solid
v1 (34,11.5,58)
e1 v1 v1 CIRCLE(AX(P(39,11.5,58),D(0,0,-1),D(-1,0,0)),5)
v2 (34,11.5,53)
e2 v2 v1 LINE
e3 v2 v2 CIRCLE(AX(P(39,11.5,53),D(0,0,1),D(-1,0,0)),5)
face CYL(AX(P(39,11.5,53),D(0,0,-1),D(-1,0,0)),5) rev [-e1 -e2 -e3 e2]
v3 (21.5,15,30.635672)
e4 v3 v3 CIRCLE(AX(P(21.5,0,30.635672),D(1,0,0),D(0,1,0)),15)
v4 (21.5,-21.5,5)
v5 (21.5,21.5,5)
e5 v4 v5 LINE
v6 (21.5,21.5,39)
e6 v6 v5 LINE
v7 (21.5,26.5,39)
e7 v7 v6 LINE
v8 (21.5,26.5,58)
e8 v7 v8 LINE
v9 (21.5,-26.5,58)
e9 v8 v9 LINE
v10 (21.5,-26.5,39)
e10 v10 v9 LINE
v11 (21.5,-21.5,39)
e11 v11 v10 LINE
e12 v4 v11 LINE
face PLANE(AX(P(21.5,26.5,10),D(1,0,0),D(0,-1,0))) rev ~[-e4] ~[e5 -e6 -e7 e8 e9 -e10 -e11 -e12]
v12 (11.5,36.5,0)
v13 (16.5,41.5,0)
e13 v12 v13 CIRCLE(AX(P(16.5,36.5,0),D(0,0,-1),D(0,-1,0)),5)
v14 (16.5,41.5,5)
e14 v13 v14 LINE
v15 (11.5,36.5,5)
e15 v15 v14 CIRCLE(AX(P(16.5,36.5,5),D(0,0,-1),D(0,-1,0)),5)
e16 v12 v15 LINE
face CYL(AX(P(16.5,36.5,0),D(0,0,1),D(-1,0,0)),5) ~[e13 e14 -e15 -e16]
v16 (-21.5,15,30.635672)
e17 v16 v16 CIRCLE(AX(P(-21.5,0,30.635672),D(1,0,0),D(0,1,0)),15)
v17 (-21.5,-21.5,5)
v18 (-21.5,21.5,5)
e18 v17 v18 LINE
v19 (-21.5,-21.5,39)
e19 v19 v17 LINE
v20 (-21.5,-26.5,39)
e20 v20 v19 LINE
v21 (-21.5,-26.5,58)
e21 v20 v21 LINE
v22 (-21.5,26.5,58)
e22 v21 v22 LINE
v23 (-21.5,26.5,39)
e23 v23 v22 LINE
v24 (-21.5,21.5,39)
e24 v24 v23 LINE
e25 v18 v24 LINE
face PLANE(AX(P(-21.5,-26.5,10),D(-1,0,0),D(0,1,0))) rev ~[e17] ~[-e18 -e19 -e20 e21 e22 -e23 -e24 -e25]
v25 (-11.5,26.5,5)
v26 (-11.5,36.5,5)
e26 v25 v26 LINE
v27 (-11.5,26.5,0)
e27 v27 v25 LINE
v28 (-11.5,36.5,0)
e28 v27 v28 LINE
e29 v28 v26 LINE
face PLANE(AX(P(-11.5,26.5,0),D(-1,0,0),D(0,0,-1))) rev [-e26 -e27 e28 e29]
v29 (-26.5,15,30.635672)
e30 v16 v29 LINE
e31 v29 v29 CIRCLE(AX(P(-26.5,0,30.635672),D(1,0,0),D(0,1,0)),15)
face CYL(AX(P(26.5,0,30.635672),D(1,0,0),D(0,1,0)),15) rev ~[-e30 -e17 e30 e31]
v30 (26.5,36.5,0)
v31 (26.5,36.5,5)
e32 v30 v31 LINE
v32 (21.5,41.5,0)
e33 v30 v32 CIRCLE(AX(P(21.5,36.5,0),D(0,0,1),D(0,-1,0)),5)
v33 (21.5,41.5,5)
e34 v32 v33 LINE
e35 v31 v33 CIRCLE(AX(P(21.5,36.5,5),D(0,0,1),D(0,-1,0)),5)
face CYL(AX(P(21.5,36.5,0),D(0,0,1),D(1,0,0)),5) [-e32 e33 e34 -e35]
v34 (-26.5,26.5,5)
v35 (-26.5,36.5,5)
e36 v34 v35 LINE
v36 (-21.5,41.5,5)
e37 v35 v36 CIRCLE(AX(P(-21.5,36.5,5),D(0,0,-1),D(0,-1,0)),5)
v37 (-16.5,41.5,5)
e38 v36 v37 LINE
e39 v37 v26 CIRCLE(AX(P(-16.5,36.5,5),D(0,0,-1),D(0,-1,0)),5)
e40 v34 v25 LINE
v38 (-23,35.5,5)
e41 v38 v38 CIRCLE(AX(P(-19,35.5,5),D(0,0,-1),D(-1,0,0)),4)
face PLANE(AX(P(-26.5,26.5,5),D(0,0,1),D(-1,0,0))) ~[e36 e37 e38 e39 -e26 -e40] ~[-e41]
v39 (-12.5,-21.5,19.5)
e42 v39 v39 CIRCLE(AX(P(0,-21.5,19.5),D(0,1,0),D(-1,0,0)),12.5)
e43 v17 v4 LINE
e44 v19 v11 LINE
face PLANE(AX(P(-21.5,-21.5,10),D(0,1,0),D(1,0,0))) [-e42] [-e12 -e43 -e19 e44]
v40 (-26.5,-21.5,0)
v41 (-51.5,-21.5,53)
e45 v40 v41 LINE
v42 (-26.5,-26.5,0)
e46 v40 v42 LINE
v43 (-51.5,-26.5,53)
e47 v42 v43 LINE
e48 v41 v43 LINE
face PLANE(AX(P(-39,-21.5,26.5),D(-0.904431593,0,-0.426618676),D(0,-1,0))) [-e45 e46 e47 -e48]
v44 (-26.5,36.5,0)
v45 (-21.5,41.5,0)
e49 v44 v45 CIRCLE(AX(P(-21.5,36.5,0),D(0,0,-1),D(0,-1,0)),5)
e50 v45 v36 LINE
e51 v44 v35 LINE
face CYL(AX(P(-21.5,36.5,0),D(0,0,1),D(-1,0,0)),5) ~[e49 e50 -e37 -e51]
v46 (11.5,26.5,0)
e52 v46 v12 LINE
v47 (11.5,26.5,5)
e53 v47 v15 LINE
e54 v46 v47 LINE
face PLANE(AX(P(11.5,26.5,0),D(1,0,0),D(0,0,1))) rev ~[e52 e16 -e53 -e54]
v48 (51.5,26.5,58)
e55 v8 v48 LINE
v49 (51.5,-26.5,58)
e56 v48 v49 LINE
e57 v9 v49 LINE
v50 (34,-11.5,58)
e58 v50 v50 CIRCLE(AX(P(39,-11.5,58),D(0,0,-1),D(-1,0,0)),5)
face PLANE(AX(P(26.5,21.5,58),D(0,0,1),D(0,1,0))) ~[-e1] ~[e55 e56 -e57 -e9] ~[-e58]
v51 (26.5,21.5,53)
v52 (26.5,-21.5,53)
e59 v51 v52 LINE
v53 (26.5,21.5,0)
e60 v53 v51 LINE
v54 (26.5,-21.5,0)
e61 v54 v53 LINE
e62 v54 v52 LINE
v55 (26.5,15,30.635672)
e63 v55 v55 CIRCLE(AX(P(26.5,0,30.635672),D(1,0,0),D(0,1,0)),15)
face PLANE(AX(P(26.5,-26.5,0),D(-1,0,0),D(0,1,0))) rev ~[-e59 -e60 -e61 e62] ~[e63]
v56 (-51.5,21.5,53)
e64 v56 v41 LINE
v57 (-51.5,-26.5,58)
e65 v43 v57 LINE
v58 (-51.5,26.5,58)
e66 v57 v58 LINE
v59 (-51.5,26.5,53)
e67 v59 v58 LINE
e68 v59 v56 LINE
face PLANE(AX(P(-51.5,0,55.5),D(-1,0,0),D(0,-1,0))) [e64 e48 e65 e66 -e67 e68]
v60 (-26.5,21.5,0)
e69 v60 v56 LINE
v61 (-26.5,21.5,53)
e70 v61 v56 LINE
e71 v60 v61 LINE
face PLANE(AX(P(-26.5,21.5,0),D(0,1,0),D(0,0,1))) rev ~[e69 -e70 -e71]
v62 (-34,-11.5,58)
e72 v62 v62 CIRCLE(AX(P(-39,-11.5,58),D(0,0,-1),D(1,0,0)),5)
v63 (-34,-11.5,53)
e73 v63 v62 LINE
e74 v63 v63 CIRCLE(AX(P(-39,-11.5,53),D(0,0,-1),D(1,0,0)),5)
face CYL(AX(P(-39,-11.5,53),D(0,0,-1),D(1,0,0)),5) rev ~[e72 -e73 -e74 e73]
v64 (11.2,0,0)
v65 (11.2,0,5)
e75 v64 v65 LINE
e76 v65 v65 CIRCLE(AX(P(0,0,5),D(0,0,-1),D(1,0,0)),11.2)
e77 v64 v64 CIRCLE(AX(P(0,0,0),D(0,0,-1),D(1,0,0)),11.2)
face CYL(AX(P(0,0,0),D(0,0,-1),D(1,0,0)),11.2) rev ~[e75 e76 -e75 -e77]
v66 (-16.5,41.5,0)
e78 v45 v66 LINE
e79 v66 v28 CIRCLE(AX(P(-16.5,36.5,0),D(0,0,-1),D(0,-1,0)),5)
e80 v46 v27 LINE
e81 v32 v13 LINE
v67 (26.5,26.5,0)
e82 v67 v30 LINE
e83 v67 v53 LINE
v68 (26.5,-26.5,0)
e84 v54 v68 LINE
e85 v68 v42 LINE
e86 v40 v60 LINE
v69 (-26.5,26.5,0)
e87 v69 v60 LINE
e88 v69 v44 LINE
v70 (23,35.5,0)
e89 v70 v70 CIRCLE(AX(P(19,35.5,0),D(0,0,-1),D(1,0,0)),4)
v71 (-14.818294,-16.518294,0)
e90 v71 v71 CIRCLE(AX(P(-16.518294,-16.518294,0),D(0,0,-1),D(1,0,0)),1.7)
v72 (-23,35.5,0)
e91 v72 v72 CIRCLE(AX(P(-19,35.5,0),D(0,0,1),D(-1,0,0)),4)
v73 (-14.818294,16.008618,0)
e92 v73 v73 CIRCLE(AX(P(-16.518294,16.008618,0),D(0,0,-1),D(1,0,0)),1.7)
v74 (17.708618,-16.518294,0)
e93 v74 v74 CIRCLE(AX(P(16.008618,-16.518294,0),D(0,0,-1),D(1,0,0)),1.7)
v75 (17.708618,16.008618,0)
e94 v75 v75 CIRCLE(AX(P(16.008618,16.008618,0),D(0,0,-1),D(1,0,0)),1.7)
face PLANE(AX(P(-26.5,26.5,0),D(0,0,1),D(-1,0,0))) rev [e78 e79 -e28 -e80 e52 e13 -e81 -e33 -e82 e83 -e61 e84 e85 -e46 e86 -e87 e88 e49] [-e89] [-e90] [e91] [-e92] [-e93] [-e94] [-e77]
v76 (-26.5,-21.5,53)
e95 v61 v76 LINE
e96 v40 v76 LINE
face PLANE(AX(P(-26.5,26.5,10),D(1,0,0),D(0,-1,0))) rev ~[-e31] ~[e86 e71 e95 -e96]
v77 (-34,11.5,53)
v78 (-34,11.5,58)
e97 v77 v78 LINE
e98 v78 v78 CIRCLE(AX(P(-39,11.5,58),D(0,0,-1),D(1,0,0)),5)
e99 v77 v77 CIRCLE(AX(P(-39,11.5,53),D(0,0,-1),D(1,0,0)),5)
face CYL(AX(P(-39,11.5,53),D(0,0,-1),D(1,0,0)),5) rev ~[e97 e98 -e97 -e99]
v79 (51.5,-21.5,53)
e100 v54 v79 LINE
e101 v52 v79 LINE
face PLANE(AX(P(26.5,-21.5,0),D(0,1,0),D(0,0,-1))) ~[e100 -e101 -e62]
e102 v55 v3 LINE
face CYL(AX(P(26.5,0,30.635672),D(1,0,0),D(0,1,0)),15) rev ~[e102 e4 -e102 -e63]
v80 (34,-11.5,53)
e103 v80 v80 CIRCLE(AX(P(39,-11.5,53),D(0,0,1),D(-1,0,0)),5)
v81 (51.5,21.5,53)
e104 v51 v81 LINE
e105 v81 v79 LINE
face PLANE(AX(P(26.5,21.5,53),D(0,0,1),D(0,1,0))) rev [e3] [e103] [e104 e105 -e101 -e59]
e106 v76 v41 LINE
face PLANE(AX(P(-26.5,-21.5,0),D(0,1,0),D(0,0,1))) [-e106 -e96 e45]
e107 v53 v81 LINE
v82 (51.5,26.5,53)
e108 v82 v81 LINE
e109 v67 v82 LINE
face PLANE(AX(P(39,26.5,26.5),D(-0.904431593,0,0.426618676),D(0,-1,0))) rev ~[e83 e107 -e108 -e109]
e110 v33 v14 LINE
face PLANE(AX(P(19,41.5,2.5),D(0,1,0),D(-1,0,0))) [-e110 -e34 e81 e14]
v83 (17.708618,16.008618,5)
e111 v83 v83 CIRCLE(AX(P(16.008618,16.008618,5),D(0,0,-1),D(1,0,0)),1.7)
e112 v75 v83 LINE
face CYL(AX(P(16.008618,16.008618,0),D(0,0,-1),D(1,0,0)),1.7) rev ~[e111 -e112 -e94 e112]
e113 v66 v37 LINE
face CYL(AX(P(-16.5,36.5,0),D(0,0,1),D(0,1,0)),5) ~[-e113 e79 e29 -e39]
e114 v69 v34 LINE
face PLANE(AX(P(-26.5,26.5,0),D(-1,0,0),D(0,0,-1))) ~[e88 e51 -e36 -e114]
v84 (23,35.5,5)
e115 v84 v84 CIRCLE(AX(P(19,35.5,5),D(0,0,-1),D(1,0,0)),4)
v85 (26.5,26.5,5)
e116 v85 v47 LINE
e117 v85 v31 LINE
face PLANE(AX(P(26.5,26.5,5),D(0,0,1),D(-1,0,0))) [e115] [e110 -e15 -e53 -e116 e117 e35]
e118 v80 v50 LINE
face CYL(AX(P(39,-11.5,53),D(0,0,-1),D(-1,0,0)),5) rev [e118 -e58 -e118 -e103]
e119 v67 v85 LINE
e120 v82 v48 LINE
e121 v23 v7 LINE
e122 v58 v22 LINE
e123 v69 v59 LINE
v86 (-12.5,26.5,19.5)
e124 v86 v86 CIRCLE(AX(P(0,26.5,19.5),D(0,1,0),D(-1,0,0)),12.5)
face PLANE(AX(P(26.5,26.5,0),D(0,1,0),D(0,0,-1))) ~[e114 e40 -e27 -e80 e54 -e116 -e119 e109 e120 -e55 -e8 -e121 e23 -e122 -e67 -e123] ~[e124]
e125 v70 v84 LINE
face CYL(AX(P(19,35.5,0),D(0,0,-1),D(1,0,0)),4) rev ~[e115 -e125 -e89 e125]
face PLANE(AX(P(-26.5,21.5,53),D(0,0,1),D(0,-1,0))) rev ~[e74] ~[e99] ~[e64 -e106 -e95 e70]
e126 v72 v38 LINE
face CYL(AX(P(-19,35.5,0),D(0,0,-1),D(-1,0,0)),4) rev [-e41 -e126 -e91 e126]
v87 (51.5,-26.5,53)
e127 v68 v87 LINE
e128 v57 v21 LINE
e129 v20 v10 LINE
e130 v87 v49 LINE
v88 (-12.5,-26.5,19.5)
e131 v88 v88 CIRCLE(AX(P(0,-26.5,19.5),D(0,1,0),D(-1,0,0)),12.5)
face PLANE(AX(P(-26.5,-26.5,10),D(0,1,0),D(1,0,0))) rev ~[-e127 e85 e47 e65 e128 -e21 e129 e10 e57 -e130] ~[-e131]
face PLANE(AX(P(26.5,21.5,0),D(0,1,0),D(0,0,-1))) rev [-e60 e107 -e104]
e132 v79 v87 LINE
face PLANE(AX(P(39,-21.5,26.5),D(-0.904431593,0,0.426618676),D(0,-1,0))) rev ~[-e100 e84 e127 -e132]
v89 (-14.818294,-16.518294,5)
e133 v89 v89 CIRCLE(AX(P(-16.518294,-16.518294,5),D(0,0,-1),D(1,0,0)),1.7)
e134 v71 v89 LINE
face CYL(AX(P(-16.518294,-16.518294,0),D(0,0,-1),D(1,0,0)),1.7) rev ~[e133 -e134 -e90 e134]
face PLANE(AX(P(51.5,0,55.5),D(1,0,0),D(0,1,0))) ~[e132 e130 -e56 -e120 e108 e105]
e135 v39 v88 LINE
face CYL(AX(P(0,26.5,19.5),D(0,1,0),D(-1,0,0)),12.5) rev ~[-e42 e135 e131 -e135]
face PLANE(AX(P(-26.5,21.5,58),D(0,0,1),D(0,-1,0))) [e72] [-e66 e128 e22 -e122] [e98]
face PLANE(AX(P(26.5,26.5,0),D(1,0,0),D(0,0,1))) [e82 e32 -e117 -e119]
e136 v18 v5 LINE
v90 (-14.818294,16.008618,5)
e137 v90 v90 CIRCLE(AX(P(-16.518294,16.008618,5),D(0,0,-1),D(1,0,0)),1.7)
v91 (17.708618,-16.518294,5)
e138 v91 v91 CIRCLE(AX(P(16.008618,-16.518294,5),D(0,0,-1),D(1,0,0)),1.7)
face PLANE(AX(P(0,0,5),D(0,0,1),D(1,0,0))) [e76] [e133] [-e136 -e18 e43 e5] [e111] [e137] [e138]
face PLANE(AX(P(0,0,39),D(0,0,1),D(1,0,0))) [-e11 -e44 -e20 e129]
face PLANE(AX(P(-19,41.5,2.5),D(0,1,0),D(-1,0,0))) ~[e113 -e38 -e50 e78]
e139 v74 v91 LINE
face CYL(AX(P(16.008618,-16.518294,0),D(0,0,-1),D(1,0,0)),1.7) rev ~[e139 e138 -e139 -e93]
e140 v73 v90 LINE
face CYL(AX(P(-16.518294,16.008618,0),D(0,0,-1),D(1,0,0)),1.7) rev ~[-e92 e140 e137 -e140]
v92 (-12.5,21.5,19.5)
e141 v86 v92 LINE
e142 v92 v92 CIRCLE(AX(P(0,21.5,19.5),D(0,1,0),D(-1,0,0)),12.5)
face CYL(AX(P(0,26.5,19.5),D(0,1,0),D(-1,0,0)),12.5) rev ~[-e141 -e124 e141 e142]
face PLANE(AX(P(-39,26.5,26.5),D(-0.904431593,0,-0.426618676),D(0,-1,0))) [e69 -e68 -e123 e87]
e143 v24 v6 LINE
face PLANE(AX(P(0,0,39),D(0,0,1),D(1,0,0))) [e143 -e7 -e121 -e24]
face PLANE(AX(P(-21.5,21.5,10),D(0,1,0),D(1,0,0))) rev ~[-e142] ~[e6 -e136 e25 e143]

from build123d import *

# Parameters (mm, degrees)
F0_W      = 53
F0_H      = 53
F1_DEPTH  = 10
F2_W      = 43
F2_H      = 43
F3_DEPTH  = 5
F4_R      = 1.7
F5_DEPTH  = 25
F6_R      = 11.2
F7_DEPTH  = 25
F9_DEPTH  = 48
F10_DEPTH = 29
F11_R     = 15
F12_DEPTH = 53.001
F13_R     = 12.5
F14_DEPTH = 53.001
F15_W     = 5
F15_H     = 58
F16_DEPTH = 25
F17_SIZE2 = 53
F17_SIZE  = 25
F18_W     = 43
F18_H     = 5
F19_DEPTH = 25
F20_R     = 5
F21_DEPTH = 25
F22_W     = 15
F22_H     = 5
F23_DEPTH = 15
F24_R     = 5
F25_R     = 4
F26_DEPTH = 25


# Not quite as in the source:
# - a pattern or mirror of a feature is missing from the dataset's text; its kind, count and spacing are read off the source's solid


with BuildPart() as f1:
    # F0 (on Top) → F1 (new body)
    with BuildSketch(Plane.XY):
        Rectangle(F0_W, F0_H)
    extrude(amount=F1_DEPTH)

    # F2 (on face) → F3 (cut)
    with BuildSketch(Plane.XY.offset(10)):
        Rectangle(F2_W, F2_H)
    extrude(amount=-F3_DEPTH, mode=Mode.SUBTRACT)

    # F4 (on face) → F5 (cut)
    with BuildSketch(Plane(origin=(0, 0, 0), x_dir=(1, 0, 0), z_dir=(0, 0, -1))):
        with Locations((-16.5182938799, 16.5182938799)):
            Circle(F4_R)
        with Locations((16.0086180547, 16.5182938799)):
            Circle(F4_R)
        with Locations((16.0086180547, -16.0086180547)):
            Circle(F4_R)
        with Locations((-16.5182938799, -16.0086180547)):
            Circle(F4_R)
    extrude(amount=-F5_DEPTH, mode=Mode.SUBTRACT)

    # F6 (on face) → F7 (cut)
    with BuildSketch(Plane(origin=(0, 0, 0), x_dir=(1, 0, 0), z_dir=(0, 0, -1))):
        Circle(F6_R)
    extrude(amount=-F7_DEPTH, mode=Mode.SUBTRACT)

    # F8 (on face) → F9 (join)
    with BuildSketch(Plane.XY.offset(10)):
        Polygon((-21.5, -21.5), (-21.5, 21.5), (-21.5, 26.5), (-26.5, 26.5), (-26.5, -26.5), (-21.5, -26.5), align=None)
        Polygon((21.5, 26.5), (21.5, 21.5), (21.5, -21.5), (21.5, -26.5), (26.5, -26.5), (26.5, 26.5), align=None)
    extrude(amount=F9_DEPTH)

    # F10 (add): faces of the model
    f10_faces = [f1.faces().sort_by_distance(p)[0] for p in [
        (0, 24, 10),
        (0, -24, 10),
    ]]
    extrude(f10_faces, amount=F10_DEPTH)

    # F11 (on face) → F12 (cut, through all)
    with BuildSketch(Plane.YZ.offset(26.5)):
        with Locations((0, 30.6356716901)):
            Circle(F11_R)
    extrude(amount=-F12_DEPTH, mode=Mode.SUBTRACT)

    # F13 (on face) → F14 (cut, through all)
    with BuildSketch(Plane(origin=(0, 26.5, 0), x_dir=(-1, 0, 0), z_dir=(0, 1, 0))):
        with Locations((0, 19.5)):
            Circle(F13_R)
    extrude(amount=-F14_DEPTH, mode=Mode.SUBTRACT)

    # F15 (on face) → F16 (join)
    with BuildSketch(Plane(origin=(-26.5, 0, 0), x_dir=(0, -1, 0), z_dir=(-1, 0, 0))):
        with Locations((-24, 29)):
            Rectangle(F15_W, F15_H)
        with Locations((24, 29)):
            Rectangle(F15_W, F15_H)
    f16 = extrude(amount=F16_DEPTH)

    # F16_copies: F16 across plane
    add(f16.mirror(Plane(origin=(0, 0, 0), x_dir=(0, 0, 1), z_dir=(1, 0, 0))))

    # F17
    f17_edges = [f1.edges().sort_by_distance(p)[0] for p in [
        (-51.5, 24, 0),
        (-51.5, -24, 0),
        (51.5, 24, 0),
        (51.5, -24, 0),
    ]]
    f17_side = f1.faces().sort_by_distance((25.341639, 0, 0))[0]
    chamfer(f17_edges, length=F17_SIZE, length2=F17_SIZE2, reference=f17_side)

    # F18 (on face) → F19 (join)
    with BuildSketch(Plane(origin=(-26.5, 0, 0), x_dir=(0, -1, 0), z_dir=(-1, 0, 0))):
        with Locations((0, 55.5)):
            Rectangle(F18_W, F18_H)
    f19 = extrude(amount=F19_DEPTH)

    # F19_copies: F19 across plane
    add(f19.mirror(Plane(origin=(0, 0, 0), x_dir=(0, 0, 1), z_dir=(1, 0, 0))))

    # F20 (on face) → F21 (cut)
    with BuildSketch(Plane(origin=(0, 0, 53), x_dir=(1, 0, 0), z_dir=(0, 0, -1))):
        with Locations((-39, 11.5)):
            Circle(F20_R)
        with Locations((-39, -11.5)):
            Circle(F20_R)
    f21 = extrude(amount=-F21_DEPTH, mode=Mode.SUBTRACT)

    # F21_copies: F21 across plane
    add(f21.mirror(Plane(origin=(0, 0, 0), x_dir=(0, 0, 1), z_dir=(1, 0, 0))), mode=Mode.SUBTRACT)

    # F22 (on face) → F23 (join)
    with BuildSketch(Plane(origin=(0, 26.5, 0), x_dir=(-1, 0, 0), z_dir=(0, 1, 0))):
        with Locations((-19, 2.5)):
            Rectangle(F22_W, F22_H)
    f23 = extrude(amount=F23_DEPTH)

    # F23_copies: F23 across plane
    add(f23.mirror(Plane(origin=(0, 0, 0), x_dir=(0, 0, -1), z_dir=(-1, 0, 0))))

    # F24
    f24_edges = [f1.edges().sort_by_distance(p)[0] for p in [
        (11.5, 41.5, 2.5),
        (26.5, 41.5, 2.5),
        (-11.5, 41.5, 2.5),
        (-26.5, 41.5, 2.5),
    ]]
    fillet(f24_edges, radius=F24_R)

    # F25 (on face) → F26 (cut)
    with BuildSketch(Plane(origin=(0, 0, 0), x_dir=(1, 0, 0), z_dir=(0, 0, -1))):
        with Locations((19, -35.5)):
            Circle(F25_R)
    f26 = extrude(amount=-F26_DEPTH, mode=Mode.SUBTRACT)

    # F26_copies: F26 across plane
    add(f26.mirror(Plane(origin=(0, 0, 0), x_dir=(0, 0, -1), z_dir=(-1, 0, 0))), mode=Mode.SUBTRACT)


solid = f1.part
